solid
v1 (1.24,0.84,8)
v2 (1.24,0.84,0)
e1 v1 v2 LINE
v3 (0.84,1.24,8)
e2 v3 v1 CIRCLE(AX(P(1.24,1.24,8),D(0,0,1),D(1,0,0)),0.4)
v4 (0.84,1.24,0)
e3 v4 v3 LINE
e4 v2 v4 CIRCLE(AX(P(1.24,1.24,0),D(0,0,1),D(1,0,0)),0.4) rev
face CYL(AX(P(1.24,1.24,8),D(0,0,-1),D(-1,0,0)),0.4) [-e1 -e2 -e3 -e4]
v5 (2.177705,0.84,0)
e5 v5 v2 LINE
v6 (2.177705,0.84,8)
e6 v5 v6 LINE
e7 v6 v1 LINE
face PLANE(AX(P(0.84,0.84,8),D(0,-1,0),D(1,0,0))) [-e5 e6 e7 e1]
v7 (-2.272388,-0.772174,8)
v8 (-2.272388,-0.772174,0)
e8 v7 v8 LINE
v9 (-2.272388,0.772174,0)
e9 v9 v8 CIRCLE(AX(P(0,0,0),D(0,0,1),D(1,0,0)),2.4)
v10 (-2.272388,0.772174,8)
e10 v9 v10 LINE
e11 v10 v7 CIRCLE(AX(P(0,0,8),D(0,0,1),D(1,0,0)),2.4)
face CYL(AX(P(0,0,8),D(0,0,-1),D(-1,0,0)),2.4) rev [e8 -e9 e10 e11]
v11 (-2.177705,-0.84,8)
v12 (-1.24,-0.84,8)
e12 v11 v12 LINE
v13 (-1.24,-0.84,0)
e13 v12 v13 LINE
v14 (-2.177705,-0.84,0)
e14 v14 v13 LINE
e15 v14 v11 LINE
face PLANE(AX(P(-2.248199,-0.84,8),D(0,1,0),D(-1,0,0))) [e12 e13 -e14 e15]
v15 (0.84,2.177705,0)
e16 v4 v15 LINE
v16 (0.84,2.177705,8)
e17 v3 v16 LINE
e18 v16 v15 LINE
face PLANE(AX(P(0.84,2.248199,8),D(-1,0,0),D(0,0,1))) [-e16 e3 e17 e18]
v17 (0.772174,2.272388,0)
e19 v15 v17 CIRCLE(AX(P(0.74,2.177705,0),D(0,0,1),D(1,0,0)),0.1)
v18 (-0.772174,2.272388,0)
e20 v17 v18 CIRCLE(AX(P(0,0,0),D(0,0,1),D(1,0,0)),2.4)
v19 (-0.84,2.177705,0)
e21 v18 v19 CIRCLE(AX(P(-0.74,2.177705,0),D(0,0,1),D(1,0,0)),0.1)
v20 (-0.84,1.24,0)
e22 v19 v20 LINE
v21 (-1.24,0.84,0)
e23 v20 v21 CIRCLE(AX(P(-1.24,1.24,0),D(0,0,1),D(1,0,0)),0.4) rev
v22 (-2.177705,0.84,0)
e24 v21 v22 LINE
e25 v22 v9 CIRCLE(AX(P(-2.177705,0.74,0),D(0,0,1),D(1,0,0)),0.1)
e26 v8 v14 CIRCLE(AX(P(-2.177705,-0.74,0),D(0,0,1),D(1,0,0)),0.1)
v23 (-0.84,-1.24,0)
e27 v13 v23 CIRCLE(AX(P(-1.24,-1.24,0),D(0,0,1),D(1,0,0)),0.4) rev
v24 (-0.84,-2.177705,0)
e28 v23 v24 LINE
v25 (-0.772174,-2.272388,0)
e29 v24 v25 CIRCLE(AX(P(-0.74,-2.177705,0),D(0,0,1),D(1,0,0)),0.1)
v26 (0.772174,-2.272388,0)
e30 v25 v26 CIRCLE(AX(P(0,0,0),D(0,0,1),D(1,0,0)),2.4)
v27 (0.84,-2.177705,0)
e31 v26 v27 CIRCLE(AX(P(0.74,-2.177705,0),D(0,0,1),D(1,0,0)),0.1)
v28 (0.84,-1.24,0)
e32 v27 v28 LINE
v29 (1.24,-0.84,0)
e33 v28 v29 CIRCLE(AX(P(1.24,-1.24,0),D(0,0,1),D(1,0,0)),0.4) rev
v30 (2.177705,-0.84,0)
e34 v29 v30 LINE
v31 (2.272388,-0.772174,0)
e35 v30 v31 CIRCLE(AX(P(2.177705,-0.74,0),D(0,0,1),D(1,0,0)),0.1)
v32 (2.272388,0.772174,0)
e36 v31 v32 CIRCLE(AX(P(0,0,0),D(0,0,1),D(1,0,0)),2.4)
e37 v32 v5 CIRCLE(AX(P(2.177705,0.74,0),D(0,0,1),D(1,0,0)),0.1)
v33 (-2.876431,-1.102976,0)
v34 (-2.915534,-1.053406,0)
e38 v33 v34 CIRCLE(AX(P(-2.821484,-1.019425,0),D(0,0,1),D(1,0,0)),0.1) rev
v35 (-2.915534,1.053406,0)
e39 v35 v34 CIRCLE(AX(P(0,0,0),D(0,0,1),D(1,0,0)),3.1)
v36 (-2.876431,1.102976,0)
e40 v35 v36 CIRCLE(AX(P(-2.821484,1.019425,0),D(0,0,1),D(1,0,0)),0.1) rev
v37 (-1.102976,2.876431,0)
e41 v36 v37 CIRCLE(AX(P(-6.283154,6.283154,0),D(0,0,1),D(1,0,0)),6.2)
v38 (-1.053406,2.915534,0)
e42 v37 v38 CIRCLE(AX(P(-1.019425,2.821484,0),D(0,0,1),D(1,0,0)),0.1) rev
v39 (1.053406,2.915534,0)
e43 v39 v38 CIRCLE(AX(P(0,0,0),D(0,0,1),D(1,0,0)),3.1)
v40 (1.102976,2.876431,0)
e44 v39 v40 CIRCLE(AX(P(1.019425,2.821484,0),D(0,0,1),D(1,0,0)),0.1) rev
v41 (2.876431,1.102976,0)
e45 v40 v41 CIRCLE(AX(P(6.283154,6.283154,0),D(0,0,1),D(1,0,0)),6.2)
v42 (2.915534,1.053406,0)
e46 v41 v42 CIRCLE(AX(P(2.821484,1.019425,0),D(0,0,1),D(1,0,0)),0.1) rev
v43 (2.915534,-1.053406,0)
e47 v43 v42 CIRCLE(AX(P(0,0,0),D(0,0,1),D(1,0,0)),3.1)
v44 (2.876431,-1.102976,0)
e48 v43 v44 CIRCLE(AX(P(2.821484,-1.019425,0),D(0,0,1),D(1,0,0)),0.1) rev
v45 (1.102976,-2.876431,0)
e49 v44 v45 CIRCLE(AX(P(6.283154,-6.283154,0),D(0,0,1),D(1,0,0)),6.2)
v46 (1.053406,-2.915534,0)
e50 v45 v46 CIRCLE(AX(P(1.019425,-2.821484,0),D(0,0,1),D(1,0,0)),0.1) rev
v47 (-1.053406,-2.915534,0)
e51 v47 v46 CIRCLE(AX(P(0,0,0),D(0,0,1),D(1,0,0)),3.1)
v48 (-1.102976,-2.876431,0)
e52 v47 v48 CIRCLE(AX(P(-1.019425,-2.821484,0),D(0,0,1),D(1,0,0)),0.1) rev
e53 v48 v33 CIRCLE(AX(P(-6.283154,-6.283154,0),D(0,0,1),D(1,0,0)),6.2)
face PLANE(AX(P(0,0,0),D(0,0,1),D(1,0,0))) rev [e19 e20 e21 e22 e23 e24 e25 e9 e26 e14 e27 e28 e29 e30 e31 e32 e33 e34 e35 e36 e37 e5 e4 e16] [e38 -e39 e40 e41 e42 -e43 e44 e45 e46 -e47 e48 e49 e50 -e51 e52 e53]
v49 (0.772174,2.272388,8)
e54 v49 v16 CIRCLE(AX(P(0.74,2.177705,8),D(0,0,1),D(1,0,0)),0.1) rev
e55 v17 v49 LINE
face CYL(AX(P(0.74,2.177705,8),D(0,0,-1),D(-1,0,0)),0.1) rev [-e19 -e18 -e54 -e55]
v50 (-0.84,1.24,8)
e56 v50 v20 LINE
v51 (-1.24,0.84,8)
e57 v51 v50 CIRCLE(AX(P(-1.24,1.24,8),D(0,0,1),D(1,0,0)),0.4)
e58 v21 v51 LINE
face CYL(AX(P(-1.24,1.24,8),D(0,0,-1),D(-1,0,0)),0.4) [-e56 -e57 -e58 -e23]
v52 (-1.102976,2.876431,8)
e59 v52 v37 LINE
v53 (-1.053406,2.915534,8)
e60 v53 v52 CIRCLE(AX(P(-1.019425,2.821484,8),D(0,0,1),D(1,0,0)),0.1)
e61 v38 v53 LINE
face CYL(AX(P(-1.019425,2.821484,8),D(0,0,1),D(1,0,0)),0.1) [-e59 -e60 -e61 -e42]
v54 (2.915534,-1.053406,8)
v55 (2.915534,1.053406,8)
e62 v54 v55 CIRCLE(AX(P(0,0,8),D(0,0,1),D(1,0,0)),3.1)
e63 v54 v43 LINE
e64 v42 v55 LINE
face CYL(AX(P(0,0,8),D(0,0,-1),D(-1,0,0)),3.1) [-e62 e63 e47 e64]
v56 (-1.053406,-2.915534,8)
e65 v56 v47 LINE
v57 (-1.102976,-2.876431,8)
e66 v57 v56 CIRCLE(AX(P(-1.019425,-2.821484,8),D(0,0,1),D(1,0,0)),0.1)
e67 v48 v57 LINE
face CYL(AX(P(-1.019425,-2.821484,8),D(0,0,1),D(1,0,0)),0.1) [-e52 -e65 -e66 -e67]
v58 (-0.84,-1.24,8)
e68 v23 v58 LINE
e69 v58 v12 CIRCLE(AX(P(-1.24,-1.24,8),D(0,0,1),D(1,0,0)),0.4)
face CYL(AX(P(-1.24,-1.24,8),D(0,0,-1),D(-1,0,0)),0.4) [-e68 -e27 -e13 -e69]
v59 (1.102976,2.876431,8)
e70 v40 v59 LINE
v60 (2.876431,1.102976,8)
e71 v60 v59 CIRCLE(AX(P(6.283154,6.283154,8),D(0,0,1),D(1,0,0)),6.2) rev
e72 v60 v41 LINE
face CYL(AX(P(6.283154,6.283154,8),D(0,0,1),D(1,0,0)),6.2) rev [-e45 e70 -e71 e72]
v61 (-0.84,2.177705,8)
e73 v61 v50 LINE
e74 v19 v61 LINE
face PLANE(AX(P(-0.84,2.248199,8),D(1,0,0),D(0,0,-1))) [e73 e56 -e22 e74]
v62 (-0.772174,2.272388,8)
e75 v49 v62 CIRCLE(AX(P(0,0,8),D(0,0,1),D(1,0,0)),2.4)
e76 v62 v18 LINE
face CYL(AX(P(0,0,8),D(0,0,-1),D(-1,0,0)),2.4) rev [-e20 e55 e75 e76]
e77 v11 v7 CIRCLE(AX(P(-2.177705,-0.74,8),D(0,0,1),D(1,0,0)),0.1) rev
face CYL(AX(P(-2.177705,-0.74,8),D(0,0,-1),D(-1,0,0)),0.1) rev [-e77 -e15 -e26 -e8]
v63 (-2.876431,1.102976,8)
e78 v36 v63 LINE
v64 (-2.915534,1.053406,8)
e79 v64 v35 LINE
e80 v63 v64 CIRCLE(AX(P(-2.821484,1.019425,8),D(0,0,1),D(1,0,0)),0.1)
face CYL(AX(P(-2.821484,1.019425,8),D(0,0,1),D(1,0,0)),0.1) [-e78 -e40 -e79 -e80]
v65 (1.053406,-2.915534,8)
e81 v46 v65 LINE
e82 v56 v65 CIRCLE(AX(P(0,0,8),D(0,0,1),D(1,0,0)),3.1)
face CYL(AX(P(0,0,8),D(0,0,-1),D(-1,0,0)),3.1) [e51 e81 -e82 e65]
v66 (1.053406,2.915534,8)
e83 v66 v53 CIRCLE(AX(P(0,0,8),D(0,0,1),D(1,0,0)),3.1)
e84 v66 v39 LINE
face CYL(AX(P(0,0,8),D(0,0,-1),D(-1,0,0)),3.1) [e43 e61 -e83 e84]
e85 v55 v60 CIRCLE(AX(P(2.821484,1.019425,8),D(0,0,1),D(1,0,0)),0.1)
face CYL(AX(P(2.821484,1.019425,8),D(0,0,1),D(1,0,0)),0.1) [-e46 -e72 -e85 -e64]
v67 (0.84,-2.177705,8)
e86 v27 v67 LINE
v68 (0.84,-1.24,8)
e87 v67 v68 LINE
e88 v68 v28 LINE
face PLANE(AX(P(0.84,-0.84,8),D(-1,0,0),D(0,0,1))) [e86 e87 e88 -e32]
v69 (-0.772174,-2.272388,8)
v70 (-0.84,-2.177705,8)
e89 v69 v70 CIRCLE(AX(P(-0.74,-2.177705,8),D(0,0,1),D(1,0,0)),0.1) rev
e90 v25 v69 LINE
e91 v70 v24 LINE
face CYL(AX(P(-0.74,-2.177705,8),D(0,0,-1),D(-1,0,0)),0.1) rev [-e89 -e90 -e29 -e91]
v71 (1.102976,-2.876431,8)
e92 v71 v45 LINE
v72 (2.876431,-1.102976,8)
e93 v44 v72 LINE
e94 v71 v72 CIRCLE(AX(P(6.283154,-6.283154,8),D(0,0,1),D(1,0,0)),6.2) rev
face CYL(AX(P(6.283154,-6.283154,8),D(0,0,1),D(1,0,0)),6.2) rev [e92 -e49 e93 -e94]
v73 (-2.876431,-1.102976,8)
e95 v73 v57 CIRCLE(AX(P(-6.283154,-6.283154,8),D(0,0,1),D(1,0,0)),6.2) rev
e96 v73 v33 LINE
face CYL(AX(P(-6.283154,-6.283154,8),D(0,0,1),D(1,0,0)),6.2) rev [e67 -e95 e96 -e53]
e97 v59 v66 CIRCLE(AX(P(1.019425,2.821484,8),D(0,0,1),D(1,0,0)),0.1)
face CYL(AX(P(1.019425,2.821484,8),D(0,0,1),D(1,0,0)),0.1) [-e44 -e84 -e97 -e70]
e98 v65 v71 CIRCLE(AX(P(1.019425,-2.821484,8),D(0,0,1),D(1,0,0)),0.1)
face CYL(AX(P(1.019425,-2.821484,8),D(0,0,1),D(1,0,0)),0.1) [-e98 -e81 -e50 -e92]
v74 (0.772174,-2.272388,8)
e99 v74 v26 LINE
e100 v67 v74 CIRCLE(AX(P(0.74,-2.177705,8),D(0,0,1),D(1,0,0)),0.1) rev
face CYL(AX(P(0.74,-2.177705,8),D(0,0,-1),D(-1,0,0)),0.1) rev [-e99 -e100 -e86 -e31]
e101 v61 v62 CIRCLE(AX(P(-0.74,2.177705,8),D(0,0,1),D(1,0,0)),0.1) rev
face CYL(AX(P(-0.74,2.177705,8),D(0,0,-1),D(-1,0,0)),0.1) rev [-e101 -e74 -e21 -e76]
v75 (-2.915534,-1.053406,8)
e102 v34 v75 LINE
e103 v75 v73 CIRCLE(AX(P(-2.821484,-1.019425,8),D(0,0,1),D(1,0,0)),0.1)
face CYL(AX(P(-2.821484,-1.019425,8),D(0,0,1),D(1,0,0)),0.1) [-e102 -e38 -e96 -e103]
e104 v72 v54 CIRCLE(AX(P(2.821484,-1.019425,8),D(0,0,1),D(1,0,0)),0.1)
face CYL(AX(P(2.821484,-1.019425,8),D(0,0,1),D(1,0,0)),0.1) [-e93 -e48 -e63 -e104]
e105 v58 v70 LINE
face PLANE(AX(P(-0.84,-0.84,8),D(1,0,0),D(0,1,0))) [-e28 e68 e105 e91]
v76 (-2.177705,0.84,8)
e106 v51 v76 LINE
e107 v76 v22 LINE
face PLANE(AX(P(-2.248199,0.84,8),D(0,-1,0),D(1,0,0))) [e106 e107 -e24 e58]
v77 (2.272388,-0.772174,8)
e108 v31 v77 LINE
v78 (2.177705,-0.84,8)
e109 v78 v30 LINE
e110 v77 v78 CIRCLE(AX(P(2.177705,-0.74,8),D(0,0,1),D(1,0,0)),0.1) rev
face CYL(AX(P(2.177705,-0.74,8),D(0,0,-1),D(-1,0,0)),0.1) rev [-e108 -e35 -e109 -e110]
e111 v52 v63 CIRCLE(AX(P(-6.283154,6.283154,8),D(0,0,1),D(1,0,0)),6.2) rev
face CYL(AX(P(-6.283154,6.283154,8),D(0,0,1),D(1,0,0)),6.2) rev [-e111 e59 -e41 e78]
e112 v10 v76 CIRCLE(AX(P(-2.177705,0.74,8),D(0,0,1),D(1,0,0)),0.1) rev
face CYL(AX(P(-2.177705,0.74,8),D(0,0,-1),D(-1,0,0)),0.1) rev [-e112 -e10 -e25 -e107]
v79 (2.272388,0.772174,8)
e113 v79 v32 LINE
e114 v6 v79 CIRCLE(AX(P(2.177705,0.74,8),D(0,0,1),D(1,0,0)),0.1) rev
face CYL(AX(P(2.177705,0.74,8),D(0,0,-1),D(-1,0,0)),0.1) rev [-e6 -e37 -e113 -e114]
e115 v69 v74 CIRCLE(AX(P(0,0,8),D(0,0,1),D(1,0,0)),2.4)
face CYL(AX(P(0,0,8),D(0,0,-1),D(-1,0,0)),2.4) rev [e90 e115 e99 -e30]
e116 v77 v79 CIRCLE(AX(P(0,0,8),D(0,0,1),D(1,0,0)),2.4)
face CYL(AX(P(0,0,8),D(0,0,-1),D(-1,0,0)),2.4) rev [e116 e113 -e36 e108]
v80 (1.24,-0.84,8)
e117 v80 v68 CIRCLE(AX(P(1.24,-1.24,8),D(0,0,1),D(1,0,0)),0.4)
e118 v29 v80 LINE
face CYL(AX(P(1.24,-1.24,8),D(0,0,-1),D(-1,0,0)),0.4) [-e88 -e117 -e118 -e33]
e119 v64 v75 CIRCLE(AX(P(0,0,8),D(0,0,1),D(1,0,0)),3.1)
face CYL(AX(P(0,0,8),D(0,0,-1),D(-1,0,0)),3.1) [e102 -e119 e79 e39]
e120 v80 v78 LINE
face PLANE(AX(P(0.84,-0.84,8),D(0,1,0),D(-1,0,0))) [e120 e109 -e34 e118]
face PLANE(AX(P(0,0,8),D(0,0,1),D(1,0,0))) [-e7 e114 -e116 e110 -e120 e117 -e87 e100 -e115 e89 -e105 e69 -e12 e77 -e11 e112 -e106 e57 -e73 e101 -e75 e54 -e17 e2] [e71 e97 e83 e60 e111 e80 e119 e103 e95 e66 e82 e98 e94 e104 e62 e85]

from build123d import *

# Parameters (mm, degrees)
BOSS_EXTRUDE1_DEPTH = 8
CUT_EXTRUDE1_DEPTH  = 8
FILLET1_R           = 0.4
FILLET2_R           = 0.4
FILLET3_R           = 0.4
FILLET4_R           = 0.4
FILLET5_R           = 6.2
FILLET6_R           = 6.2
FILLET7_R           = 6.2
FILLET8_R           = 6.2
FILLET9_R           = 0.1
FILLET10_R          = 0.1
FILLET11_R          = 0.1
FILLET12_R          = 0.1
FILLET13_R          = 0.1
FILLET14_R          = 0.1
FILLET15_R          = 0.1
FILLET16_R          = 0.1
FILLET17_R          = 0.1
FILLET18_R          = 0.1
FILLET19_R          = 0.1
FILLET20_R          = 0.1
FILLET21_R          = 0.1
FILLET22_R          = 0.1
FILLET23_R          = 0.1
FILLET24_R          = 0.1


with BuildPart() as part:
    # Sketch1 → Boss-Extrude1 (new body)
    with BuildSketch(Plane.XY):
        with BuildLine():
            Line((-1.085, -1.085), (-1.085, -2.903924069))
            ThreePointArc((-1.085, -2.903924069), (0, -3.1), (1.085, -2.903924069))
            Line((1.085, -2.903924069), (1.085, -1.085))
            Line((1.085, -1.085), (2.903924069, -1.085))
            ThreePointArc((2.903924069, -1.085), (3.1, 0), (2.903924069, 1.085))
            Line((2.903924069, 1.085), (1.085, 1.085))
            Line((1.085, 1.085), (1.085, 2.903924069))
            ThreePointArc((1.085, 2.903924069), (0, 3.1), (-1.085, 2.903924069))
            Line((-1.085, 2.903924069), (-1.085, 1.085))
            Line((-1.085, 1.085), (-2.903924069, 1.085))
            ThreePointArc((-2.903924069, 1.085), (-3.1, 0), (-2.903924069, -1.085))
            Line((-2.903924069, -1.085), (-1.085, -1.085))
        make_face()
    extrude(amount=BOSS_EXTRUDE1_DEPTH)

    # Sketch2 → Cut-Extrude1 (cut)
    with BuildSketch(Plane.XY):
        with BuildLine():
            Line((0.84, -0.84), (2.248199279, -0.84))
            ThreePointArc((2.248199279, -0.84), (2.4, 0), (2.248199279, 0.84))
            Line((2.248199279, 0.84), (0.84, 0.84))
            Line((0.84, 0.84), (0.84, 2.248199279))
            ThreePointArc((0.84, 2.248199279), (0, 2.4), (-0.84, 2.248199279))
            Line((-0.84, 2.248199279), (-0.84, 0.84))
            Line((-0.84, 0.84), (-2.248199279, 0.84))
            ThreePointArc((-2.248199279, 0.84), (-2.4, 0), (-2.248199279, -0.84))
            Line((-2.248199279, -0.84), (-0.84, -0.84))
            Line((-0.84, -0.84), (-0.84, -2.248199279))
            ThreePointArc((-0.84, -2.248199279), (0, -2.4), (0.84, -2.248199279))
            Line((0.84, -2.248199279), (0.84, -0.84))
        make_face()
    extrude(amount=CUT_EXTRUDE1_DEPTH, mode=Mode.SUBTRACT)

    # Fillet1
    fillet1_edges = [part.edges().sort_by_distance(p)[0] for p in [
        (-0.84, 0.84, 4),
    ]]
    fillet(fillet1_edges, radius=FILLET1_R)

    # Fillet2
    fillet2_edges = [part.edges().sort_by_distance(p)[0] for p in [
        (0.84, 0.84, 4),
    ]]
    fillet(fillet2_edges, radius=FILLET2_R)

    # Fillet3
    fillet3_edges = [part.edges().sort_by_distance(p)[0] for p in [
        (0.84, -0.84, 4),
    ]]
    fillet(fillet3_edges, radius=FILLET3_R)

    # Fillet4
    fillet4_edges = [part.edges().sort_by_distance(p)[0] for p in [
        (-0.84, -0.84, 4),
    ]]
    fillet(fillet4_edges, radius=FILLET4_R)

    # Fillet5
    # the kernel refuses this fillet: 6.2 mm, written as the material it adds along each edge
    with BuildSketch(Plane(origin=(-1.085, 1.085, 0), x_dir=(-1, 0, 0), z_dir=(0, 0, 1))) as fillet5_piece_1:
        with BuildLine():
            CenterArc((5.198154004, -5.198154004), FILLET5_R, 123.027198012, 23.945603977)
            Line((0, -1.818924069), (0, 0))
            Line((0, 0), (1.818924069, 0))
        make_face()
    extrude(amount=8)

    # Fillet6
    # the kernel refuses this fillet: 6.2 mm, written as the material it adds along each edge
    with BuildSketch(Plane(origin=(-1.085, -1.085, 0), x_dir=(-1, 0, 0), z_dir=(0, 0, 1))) as fillet6_piece_1:
        with BuildLine():
            CenterArc((5.198154004, 5.198154004), FILLET6_R, 213.027198012, 23.945603977)
            Line((0, 1.818924069), (0, 0))
            Line((0, 0), (1.818924069, 0))
        make_face()
    extrude(amount=8)

    # Fillet7
    # the kernel refuses this fillet: 6.2 mm, written as the material it adds along each edge
    with BuildSketch(Plane(origin=(1.085, -1.085, 0), x_dir=(0, -1, 0), z_dir=(0, 0, 1))) as fillet7_piece_1:
        with BuildLine():
            CenterArc((5.198154004, 5.198154004), FILLET7_R, 213.027198012, 23.945603977)
            Line((0, 1.818924069), (0, 0))
            Line((0, 0), (1.818924069, 0))
        make_face()
    extrude(amount=8)

    # Fillet8
    # the kernel refuses this fillet: 6.2 mm, written as the material it adds along each edge
    with BuildSketch(Plane(origin=(1.085, 1.085, 0), x_dir=(1, 0, 0), z_dir=(0, 0, 1))) as fillet8_piece_1:
        with BuildLine():
            CenterArc((5.198154004, 5.198154004), FILLET8_R, 213.027198012, 23.945603977)
            Line((0, 1.818924069), (0, 0))
            Line((0, 0), (1.818924069, 0))
        make_face()
    extrude(amount=8)

    # Fillet9
    fillet9_edges = [part.edges().sort_by_distance(p)[0] for p in [
        (0.84, 2.248199279, 4),
    ]]
    fillet(fillet9_edges, radius=FILLET9_R)

    # Fillet10
    fillet10_edges = [part.edges().sort_by_distance(p)[0] for p in [
        (1.085, 2.903924069, 4),
    ]]
    fillet(fillet10_edges, radius=FILLET10_R)

    # Fillet11
    fillet11_edges = [part.edges().sort_by_distance(p)[0] for p in [
        (-1.085, 2.903924069, 4),
    ]]
    fillet(fillet11_edges, radius=FILLET11_R)

    # Fillet12
    fillet12_edges = [part.edges().sort_by_distance(p)[0] for p in [
        (-2.903924069, 1.085, 4),
    ]]
    fillet(fillet12_edges, radius=FILLET12_R)

    # Fillet13
    fillet13_edges = [part.edges().sort_by_distance(p)[0] for p in [
        (-2.903924069, -1.085, 4),
    ]]
    fillet(fillet13_edges, radius=FILLET13_R)

    # Fillet14
    fillet14_edges = [part.edges().sort_by_distance(p)[0] for p in [
        (-1.085, -2.903924069, 4),
    ]]
    fillet(fillet14_edges, radius=FILLET14_R)

    # Fillet15
    fillet15_edges = [part.edges().sort_by_distance(p)[0] for p in [
        (1.085, -2.903924069, 4),
    ]]
    fillet(fillet15_edges, radius=FILLET15_R)

    # Fillet16
    fillet16_edges = [part.edges().sort_by_distance(p)[0] for p in [
        (2.903924069, -1.085, 4),
    ]]
    fillet(fillet16_edges, radius=FILLET16_R)

    # Fillet17
    fillet17_edges = [part.edges().sort_by_distance(p)[0] for p in [
        (2.903924069, 1.085, 4),
    ]]
    fillet(fillet17_edges, radius=FILLET17_R)

    # Fillet18
    fillet18_edges = [part.edges().sort_by_distance(p)[0] for p in [
        (0.84, -2.248199279, 4),
    ]]
    fillet(fillet18_edges, radius=FILLET18_R)

    # Fillet19
    fillet19_edges = [part.edges().sort_by_distance(p)[0] for p in [
        (-0.84, -2.248199279, 4),
    ]]
    fillet(fillet19_edges, radius=FILLET19_R)

    # Fillet20
    fillet20_edges = [part.edges().sort_by_distance(p)[0] for p in [
        (-2.248199279, 0.84, 4),
    ]]
    fillet(fillet20_edges, radius=FILLET20_R)

    # Fillet21
    fillet21_edges = [part.edges().sort_by_distance(p)[0] for p in [
        (-2.248199279, -0.84, 4),
    ]]
    fillet(fillet21_edges, radius=FILLET21_R)

    # Fillet22
    fillet22_edges = [part.edges().sort_by_distance(p)[0] for p in [
        (-0.84, 2.248199279, 4),
    ]]
    fillet(fillet22_edges, radius=FILLET22_R)

    # Fillet23
    fillet23_edges = [part.edges().sort_by_distance(p)[0] for p in [
        (2.248199279, -0.84, 4),
    ]]
    fillet(fillet23_edges, radius=FILLET23_R)

    # Fillet24
    fillet24_edges = [part.edges().sort_by_distance(p)[0] for p in [
        (2.248199279, 0.84, 4),
    ]]
    fillet(fillet24_edges, radius=FILLET24_R)


solid = part.part
